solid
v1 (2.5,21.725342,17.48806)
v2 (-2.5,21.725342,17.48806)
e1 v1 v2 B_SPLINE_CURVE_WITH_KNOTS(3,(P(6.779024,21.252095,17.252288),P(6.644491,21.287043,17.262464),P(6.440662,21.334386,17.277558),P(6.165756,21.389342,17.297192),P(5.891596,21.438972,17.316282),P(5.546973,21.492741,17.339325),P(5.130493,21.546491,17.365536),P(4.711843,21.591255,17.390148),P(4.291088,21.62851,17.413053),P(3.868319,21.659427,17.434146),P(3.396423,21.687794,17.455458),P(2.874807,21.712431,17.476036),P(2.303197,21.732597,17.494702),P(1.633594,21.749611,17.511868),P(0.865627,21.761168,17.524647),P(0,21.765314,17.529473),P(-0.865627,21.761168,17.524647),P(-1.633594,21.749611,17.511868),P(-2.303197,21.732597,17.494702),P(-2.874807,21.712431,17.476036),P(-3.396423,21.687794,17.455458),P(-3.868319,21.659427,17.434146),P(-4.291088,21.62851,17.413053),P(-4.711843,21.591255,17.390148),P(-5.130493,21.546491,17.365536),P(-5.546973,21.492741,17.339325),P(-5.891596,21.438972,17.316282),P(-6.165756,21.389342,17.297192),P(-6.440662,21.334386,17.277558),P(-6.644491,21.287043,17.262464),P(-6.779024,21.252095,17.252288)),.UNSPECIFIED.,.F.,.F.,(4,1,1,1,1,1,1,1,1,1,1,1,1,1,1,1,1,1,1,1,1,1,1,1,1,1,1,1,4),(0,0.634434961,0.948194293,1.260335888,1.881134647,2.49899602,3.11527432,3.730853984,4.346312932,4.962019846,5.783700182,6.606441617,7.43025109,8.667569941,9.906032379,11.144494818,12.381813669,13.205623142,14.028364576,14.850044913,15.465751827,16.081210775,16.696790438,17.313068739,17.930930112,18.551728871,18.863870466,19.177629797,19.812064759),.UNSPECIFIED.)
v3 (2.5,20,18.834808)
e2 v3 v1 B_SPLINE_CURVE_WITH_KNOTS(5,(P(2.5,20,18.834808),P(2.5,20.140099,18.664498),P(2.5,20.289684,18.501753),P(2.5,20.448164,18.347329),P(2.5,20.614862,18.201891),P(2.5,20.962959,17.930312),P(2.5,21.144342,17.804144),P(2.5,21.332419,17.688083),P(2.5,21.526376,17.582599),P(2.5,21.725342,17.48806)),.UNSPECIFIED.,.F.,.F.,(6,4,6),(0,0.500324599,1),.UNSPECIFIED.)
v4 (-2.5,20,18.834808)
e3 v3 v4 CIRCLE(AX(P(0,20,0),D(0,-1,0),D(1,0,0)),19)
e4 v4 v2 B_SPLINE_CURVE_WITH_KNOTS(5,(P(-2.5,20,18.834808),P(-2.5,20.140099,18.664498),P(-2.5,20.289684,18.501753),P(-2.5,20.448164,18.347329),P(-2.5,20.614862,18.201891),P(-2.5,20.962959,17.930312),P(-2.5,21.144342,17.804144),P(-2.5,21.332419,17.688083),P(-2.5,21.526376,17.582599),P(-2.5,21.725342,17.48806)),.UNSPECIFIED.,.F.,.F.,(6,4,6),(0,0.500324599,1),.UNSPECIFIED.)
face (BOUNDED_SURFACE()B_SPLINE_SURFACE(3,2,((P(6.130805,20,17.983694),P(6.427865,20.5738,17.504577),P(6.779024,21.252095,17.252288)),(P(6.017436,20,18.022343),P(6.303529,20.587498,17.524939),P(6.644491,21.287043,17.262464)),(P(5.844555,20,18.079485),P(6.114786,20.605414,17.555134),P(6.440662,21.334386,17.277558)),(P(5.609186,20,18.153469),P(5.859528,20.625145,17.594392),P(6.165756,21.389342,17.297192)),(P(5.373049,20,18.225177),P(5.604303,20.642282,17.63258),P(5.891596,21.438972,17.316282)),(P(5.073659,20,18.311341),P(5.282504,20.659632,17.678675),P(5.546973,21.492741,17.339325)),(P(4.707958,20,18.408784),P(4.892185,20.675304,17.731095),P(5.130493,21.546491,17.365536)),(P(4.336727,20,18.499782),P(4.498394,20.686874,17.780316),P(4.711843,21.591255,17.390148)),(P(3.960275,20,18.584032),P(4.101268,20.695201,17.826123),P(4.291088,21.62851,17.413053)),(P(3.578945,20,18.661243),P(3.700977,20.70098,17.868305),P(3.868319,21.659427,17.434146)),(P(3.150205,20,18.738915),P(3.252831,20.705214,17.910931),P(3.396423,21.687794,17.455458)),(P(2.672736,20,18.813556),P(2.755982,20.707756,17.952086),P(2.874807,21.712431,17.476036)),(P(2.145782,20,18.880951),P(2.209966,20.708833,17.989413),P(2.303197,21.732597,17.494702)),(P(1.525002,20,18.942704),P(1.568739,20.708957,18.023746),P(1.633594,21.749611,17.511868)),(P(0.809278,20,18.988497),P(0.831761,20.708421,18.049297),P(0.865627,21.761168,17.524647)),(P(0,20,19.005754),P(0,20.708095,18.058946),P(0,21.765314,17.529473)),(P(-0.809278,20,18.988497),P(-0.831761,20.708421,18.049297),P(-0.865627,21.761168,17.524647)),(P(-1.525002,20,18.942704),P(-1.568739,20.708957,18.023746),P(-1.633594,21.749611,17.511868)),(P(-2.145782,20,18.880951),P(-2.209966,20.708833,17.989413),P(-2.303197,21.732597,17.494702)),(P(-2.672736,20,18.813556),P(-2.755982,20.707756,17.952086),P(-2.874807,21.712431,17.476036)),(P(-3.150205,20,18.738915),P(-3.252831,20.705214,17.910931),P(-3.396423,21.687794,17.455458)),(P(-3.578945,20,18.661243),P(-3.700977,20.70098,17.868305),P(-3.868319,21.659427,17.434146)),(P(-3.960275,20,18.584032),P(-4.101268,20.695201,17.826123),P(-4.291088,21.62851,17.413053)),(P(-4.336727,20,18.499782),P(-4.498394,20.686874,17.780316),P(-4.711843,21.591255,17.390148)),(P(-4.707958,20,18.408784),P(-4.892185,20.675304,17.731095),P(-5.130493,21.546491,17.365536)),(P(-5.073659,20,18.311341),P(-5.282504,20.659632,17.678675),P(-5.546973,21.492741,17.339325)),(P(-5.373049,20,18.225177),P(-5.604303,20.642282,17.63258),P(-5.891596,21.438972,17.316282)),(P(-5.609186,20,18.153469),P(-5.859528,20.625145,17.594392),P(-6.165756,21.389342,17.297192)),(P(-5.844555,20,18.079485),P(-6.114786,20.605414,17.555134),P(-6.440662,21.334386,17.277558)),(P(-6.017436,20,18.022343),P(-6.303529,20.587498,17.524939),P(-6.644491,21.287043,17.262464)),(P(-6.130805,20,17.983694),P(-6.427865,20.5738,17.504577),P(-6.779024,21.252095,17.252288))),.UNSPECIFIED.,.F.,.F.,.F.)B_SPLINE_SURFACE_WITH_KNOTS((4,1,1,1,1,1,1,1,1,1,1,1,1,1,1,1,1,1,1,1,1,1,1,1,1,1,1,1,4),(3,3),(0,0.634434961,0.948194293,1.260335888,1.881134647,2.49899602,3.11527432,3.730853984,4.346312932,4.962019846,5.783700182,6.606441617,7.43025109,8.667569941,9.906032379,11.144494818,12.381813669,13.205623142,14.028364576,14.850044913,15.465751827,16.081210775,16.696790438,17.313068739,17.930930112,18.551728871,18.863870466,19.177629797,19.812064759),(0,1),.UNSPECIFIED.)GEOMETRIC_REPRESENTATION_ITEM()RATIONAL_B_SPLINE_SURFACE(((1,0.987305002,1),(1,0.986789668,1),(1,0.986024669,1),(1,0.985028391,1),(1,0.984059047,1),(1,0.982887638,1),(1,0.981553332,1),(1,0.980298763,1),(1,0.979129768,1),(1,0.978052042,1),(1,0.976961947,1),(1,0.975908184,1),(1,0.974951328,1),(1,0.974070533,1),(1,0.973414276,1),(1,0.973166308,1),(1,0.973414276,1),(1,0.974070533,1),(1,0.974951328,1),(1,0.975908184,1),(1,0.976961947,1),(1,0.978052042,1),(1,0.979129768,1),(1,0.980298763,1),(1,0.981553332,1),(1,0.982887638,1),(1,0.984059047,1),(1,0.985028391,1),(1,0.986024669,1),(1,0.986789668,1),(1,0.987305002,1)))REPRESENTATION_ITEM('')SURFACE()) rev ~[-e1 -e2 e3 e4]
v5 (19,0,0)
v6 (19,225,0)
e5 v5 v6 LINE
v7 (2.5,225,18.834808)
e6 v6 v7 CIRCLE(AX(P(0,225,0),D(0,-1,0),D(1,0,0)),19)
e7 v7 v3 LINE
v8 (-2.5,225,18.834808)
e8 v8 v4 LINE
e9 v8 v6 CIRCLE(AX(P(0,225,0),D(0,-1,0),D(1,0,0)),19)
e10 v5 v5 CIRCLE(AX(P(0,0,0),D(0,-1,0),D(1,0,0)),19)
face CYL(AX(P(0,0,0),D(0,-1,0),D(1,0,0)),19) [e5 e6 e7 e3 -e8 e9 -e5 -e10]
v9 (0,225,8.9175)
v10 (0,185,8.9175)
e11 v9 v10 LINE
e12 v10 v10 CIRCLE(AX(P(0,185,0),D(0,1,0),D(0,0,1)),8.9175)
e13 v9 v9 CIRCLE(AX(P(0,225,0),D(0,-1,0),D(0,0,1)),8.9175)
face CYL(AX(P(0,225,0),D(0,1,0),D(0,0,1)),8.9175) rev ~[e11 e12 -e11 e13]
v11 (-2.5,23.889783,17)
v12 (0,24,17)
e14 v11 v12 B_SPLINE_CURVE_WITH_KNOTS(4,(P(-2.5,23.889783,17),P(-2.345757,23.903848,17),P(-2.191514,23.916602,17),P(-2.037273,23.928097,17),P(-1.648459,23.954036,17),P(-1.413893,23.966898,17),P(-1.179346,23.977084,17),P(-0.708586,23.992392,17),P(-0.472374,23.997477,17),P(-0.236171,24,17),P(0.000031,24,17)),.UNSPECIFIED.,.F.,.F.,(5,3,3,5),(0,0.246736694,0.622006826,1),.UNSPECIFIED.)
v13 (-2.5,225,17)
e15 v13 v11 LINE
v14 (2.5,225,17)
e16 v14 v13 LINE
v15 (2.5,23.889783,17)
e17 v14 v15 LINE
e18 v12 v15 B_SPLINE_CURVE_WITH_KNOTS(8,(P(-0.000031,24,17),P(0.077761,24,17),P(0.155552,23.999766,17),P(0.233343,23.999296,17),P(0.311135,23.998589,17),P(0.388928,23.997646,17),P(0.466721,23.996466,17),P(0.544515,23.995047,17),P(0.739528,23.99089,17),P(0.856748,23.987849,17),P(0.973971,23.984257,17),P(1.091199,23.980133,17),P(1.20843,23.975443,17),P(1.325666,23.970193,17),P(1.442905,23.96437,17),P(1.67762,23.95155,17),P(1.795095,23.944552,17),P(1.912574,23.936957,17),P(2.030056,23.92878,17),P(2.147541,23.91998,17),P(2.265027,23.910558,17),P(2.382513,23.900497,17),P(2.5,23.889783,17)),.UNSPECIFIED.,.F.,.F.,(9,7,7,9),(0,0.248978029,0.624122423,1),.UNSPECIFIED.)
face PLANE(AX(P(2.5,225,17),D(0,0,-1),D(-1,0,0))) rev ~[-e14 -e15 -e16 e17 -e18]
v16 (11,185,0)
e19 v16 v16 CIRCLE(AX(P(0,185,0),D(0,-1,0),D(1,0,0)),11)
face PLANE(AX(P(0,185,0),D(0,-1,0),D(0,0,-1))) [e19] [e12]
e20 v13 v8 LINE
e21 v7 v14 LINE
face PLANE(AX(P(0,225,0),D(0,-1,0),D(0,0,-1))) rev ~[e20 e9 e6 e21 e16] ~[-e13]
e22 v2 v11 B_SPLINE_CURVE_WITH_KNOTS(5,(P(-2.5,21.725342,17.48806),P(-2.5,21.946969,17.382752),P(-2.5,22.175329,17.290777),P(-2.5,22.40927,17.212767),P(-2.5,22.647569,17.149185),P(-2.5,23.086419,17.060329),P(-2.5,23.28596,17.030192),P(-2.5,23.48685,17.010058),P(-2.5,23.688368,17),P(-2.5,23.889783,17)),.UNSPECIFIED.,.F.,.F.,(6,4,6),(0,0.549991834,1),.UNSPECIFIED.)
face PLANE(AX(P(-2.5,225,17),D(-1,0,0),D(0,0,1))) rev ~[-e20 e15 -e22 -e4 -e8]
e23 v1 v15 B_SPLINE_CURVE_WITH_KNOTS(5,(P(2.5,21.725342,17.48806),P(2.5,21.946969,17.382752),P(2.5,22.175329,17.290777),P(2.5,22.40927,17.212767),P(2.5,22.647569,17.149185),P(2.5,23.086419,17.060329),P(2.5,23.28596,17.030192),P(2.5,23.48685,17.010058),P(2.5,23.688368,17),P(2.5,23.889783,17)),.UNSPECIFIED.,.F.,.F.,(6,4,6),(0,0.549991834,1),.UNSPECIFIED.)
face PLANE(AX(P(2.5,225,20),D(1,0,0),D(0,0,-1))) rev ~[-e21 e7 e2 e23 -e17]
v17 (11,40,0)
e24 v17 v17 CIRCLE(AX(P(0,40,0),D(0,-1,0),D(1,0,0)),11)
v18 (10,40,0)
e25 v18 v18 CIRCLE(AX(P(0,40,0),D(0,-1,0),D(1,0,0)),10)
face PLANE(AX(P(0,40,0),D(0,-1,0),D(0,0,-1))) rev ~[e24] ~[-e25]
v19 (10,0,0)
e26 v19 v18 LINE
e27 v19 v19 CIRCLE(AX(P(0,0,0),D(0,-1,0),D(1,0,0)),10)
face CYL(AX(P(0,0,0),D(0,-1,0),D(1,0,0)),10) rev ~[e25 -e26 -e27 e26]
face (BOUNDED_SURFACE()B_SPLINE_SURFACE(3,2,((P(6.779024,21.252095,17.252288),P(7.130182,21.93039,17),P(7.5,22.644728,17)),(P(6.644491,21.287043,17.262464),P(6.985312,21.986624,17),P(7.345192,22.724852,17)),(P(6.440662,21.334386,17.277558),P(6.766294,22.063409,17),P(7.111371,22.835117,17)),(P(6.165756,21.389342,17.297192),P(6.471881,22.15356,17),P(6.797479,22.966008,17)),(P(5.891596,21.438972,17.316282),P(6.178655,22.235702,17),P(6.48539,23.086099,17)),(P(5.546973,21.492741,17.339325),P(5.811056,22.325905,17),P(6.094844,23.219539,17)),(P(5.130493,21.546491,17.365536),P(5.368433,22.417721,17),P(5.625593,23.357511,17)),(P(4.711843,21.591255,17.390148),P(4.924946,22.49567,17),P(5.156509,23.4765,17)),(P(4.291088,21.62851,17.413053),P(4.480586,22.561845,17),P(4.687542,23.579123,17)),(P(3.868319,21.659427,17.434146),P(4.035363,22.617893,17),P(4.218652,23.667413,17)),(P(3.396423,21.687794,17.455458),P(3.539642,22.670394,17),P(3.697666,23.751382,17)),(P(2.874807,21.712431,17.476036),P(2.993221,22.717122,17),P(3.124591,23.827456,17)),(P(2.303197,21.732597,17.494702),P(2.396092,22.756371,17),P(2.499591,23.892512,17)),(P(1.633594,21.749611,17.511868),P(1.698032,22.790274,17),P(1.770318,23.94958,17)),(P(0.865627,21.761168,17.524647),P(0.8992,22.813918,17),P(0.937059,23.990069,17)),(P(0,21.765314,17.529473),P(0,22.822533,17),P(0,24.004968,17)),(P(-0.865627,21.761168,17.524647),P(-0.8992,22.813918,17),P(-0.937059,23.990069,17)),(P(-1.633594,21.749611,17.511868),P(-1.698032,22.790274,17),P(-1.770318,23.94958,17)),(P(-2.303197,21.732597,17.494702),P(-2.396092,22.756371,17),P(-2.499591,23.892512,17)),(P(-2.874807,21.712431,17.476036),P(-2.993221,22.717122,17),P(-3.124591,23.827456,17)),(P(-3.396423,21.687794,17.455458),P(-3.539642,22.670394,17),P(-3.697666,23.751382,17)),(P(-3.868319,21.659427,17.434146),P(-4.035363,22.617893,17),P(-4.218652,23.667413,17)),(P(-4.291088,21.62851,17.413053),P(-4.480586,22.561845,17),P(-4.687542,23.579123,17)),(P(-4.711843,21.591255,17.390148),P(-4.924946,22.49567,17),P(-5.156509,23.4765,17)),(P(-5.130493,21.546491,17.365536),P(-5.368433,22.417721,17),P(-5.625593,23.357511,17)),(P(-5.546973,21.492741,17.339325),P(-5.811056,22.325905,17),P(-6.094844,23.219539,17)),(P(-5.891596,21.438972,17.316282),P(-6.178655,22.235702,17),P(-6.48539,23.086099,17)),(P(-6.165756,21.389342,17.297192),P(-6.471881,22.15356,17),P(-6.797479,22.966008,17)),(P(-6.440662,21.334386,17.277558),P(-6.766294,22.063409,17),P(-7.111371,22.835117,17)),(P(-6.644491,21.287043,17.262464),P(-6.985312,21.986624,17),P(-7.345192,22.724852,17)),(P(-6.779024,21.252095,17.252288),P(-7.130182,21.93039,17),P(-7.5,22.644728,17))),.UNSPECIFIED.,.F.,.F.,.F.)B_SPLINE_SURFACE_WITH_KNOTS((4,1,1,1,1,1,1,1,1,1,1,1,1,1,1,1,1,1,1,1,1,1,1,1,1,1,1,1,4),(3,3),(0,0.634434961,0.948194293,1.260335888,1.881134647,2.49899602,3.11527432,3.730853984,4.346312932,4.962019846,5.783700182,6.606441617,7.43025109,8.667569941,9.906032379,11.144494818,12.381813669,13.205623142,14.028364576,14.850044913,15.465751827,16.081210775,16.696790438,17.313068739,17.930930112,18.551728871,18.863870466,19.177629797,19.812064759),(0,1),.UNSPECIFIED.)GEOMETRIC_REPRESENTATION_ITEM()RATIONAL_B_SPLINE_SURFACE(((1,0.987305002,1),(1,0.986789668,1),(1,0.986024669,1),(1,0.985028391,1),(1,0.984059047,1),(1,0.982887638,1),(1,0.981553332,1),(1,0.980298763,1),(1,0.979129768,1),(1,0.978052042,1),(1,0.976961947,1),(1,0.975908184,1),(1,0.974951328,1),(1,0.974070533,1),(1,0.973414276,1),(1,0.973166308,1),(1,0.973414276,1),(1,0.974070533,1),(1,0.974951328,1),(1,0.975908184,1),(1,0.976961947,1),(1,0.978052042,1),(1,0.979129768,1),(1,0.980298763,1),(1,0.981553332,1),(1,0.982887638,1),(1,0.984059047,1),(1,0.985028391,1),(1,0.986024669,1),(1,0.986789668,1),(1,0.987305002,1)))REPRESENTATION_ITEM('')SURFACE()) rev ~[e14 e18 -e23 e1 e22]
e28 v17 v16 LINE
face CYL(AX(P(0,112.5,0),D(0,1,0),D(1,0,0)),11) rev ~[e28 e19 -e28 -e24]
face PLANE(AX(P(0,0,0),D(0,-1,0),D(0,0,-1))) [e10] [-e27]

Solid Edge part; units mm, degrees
sketch "Sketch1" plane through (0, 0, 0) normal (0, -1, 0) x (1, 0, 0)
  circle A0 centre (0, 0) radius 19
  dimension "D1" = 38
extrude "Protrusion1" add sketch "Sketch1" against normal blind 225
sketch "Sketch2" plane through (0, 0, 0) normal (0, -1, 0) x (1, 0, 0)
  circle A0 centre (0, 0) radius 10
extrude "ExtrudedCutout_1" cut sketch "Sketch2" against normal blind 40
sketch "Sketch3" plane through (0, 112.5, 0) normal (0, -1, 0) x (1, 0, 0)
  circle A0 centre (0, 0) radius 11
extrude "ExtrudedCutout_3" cut sketch "Sketch3" along normal mid plane 145
hole "Hole_1" at (0, 225, 0) direction (0, -1, 0) diameter 17.835 end up to next thread major 20 thread length 45
sketch "Sketch4" plane through (0, 225, 0) normal (0, 1, 0) x (1, 0, 0)
  line L0 (-2.5, -20) -> (2.5, -20)
  line L1 (2.5, -20) -> (2.5, -17)
  line L2 (2.5, -17) -> (-2.5, -17)
  line L3 (-2.5, -17) -> (-2.5, -20)
extrude "ExtrudedCutout_5" cut sketch "Sketch4" against normal blind 205
fillet "Round_2" radius 5 1 edges at (0, 20, 17)
